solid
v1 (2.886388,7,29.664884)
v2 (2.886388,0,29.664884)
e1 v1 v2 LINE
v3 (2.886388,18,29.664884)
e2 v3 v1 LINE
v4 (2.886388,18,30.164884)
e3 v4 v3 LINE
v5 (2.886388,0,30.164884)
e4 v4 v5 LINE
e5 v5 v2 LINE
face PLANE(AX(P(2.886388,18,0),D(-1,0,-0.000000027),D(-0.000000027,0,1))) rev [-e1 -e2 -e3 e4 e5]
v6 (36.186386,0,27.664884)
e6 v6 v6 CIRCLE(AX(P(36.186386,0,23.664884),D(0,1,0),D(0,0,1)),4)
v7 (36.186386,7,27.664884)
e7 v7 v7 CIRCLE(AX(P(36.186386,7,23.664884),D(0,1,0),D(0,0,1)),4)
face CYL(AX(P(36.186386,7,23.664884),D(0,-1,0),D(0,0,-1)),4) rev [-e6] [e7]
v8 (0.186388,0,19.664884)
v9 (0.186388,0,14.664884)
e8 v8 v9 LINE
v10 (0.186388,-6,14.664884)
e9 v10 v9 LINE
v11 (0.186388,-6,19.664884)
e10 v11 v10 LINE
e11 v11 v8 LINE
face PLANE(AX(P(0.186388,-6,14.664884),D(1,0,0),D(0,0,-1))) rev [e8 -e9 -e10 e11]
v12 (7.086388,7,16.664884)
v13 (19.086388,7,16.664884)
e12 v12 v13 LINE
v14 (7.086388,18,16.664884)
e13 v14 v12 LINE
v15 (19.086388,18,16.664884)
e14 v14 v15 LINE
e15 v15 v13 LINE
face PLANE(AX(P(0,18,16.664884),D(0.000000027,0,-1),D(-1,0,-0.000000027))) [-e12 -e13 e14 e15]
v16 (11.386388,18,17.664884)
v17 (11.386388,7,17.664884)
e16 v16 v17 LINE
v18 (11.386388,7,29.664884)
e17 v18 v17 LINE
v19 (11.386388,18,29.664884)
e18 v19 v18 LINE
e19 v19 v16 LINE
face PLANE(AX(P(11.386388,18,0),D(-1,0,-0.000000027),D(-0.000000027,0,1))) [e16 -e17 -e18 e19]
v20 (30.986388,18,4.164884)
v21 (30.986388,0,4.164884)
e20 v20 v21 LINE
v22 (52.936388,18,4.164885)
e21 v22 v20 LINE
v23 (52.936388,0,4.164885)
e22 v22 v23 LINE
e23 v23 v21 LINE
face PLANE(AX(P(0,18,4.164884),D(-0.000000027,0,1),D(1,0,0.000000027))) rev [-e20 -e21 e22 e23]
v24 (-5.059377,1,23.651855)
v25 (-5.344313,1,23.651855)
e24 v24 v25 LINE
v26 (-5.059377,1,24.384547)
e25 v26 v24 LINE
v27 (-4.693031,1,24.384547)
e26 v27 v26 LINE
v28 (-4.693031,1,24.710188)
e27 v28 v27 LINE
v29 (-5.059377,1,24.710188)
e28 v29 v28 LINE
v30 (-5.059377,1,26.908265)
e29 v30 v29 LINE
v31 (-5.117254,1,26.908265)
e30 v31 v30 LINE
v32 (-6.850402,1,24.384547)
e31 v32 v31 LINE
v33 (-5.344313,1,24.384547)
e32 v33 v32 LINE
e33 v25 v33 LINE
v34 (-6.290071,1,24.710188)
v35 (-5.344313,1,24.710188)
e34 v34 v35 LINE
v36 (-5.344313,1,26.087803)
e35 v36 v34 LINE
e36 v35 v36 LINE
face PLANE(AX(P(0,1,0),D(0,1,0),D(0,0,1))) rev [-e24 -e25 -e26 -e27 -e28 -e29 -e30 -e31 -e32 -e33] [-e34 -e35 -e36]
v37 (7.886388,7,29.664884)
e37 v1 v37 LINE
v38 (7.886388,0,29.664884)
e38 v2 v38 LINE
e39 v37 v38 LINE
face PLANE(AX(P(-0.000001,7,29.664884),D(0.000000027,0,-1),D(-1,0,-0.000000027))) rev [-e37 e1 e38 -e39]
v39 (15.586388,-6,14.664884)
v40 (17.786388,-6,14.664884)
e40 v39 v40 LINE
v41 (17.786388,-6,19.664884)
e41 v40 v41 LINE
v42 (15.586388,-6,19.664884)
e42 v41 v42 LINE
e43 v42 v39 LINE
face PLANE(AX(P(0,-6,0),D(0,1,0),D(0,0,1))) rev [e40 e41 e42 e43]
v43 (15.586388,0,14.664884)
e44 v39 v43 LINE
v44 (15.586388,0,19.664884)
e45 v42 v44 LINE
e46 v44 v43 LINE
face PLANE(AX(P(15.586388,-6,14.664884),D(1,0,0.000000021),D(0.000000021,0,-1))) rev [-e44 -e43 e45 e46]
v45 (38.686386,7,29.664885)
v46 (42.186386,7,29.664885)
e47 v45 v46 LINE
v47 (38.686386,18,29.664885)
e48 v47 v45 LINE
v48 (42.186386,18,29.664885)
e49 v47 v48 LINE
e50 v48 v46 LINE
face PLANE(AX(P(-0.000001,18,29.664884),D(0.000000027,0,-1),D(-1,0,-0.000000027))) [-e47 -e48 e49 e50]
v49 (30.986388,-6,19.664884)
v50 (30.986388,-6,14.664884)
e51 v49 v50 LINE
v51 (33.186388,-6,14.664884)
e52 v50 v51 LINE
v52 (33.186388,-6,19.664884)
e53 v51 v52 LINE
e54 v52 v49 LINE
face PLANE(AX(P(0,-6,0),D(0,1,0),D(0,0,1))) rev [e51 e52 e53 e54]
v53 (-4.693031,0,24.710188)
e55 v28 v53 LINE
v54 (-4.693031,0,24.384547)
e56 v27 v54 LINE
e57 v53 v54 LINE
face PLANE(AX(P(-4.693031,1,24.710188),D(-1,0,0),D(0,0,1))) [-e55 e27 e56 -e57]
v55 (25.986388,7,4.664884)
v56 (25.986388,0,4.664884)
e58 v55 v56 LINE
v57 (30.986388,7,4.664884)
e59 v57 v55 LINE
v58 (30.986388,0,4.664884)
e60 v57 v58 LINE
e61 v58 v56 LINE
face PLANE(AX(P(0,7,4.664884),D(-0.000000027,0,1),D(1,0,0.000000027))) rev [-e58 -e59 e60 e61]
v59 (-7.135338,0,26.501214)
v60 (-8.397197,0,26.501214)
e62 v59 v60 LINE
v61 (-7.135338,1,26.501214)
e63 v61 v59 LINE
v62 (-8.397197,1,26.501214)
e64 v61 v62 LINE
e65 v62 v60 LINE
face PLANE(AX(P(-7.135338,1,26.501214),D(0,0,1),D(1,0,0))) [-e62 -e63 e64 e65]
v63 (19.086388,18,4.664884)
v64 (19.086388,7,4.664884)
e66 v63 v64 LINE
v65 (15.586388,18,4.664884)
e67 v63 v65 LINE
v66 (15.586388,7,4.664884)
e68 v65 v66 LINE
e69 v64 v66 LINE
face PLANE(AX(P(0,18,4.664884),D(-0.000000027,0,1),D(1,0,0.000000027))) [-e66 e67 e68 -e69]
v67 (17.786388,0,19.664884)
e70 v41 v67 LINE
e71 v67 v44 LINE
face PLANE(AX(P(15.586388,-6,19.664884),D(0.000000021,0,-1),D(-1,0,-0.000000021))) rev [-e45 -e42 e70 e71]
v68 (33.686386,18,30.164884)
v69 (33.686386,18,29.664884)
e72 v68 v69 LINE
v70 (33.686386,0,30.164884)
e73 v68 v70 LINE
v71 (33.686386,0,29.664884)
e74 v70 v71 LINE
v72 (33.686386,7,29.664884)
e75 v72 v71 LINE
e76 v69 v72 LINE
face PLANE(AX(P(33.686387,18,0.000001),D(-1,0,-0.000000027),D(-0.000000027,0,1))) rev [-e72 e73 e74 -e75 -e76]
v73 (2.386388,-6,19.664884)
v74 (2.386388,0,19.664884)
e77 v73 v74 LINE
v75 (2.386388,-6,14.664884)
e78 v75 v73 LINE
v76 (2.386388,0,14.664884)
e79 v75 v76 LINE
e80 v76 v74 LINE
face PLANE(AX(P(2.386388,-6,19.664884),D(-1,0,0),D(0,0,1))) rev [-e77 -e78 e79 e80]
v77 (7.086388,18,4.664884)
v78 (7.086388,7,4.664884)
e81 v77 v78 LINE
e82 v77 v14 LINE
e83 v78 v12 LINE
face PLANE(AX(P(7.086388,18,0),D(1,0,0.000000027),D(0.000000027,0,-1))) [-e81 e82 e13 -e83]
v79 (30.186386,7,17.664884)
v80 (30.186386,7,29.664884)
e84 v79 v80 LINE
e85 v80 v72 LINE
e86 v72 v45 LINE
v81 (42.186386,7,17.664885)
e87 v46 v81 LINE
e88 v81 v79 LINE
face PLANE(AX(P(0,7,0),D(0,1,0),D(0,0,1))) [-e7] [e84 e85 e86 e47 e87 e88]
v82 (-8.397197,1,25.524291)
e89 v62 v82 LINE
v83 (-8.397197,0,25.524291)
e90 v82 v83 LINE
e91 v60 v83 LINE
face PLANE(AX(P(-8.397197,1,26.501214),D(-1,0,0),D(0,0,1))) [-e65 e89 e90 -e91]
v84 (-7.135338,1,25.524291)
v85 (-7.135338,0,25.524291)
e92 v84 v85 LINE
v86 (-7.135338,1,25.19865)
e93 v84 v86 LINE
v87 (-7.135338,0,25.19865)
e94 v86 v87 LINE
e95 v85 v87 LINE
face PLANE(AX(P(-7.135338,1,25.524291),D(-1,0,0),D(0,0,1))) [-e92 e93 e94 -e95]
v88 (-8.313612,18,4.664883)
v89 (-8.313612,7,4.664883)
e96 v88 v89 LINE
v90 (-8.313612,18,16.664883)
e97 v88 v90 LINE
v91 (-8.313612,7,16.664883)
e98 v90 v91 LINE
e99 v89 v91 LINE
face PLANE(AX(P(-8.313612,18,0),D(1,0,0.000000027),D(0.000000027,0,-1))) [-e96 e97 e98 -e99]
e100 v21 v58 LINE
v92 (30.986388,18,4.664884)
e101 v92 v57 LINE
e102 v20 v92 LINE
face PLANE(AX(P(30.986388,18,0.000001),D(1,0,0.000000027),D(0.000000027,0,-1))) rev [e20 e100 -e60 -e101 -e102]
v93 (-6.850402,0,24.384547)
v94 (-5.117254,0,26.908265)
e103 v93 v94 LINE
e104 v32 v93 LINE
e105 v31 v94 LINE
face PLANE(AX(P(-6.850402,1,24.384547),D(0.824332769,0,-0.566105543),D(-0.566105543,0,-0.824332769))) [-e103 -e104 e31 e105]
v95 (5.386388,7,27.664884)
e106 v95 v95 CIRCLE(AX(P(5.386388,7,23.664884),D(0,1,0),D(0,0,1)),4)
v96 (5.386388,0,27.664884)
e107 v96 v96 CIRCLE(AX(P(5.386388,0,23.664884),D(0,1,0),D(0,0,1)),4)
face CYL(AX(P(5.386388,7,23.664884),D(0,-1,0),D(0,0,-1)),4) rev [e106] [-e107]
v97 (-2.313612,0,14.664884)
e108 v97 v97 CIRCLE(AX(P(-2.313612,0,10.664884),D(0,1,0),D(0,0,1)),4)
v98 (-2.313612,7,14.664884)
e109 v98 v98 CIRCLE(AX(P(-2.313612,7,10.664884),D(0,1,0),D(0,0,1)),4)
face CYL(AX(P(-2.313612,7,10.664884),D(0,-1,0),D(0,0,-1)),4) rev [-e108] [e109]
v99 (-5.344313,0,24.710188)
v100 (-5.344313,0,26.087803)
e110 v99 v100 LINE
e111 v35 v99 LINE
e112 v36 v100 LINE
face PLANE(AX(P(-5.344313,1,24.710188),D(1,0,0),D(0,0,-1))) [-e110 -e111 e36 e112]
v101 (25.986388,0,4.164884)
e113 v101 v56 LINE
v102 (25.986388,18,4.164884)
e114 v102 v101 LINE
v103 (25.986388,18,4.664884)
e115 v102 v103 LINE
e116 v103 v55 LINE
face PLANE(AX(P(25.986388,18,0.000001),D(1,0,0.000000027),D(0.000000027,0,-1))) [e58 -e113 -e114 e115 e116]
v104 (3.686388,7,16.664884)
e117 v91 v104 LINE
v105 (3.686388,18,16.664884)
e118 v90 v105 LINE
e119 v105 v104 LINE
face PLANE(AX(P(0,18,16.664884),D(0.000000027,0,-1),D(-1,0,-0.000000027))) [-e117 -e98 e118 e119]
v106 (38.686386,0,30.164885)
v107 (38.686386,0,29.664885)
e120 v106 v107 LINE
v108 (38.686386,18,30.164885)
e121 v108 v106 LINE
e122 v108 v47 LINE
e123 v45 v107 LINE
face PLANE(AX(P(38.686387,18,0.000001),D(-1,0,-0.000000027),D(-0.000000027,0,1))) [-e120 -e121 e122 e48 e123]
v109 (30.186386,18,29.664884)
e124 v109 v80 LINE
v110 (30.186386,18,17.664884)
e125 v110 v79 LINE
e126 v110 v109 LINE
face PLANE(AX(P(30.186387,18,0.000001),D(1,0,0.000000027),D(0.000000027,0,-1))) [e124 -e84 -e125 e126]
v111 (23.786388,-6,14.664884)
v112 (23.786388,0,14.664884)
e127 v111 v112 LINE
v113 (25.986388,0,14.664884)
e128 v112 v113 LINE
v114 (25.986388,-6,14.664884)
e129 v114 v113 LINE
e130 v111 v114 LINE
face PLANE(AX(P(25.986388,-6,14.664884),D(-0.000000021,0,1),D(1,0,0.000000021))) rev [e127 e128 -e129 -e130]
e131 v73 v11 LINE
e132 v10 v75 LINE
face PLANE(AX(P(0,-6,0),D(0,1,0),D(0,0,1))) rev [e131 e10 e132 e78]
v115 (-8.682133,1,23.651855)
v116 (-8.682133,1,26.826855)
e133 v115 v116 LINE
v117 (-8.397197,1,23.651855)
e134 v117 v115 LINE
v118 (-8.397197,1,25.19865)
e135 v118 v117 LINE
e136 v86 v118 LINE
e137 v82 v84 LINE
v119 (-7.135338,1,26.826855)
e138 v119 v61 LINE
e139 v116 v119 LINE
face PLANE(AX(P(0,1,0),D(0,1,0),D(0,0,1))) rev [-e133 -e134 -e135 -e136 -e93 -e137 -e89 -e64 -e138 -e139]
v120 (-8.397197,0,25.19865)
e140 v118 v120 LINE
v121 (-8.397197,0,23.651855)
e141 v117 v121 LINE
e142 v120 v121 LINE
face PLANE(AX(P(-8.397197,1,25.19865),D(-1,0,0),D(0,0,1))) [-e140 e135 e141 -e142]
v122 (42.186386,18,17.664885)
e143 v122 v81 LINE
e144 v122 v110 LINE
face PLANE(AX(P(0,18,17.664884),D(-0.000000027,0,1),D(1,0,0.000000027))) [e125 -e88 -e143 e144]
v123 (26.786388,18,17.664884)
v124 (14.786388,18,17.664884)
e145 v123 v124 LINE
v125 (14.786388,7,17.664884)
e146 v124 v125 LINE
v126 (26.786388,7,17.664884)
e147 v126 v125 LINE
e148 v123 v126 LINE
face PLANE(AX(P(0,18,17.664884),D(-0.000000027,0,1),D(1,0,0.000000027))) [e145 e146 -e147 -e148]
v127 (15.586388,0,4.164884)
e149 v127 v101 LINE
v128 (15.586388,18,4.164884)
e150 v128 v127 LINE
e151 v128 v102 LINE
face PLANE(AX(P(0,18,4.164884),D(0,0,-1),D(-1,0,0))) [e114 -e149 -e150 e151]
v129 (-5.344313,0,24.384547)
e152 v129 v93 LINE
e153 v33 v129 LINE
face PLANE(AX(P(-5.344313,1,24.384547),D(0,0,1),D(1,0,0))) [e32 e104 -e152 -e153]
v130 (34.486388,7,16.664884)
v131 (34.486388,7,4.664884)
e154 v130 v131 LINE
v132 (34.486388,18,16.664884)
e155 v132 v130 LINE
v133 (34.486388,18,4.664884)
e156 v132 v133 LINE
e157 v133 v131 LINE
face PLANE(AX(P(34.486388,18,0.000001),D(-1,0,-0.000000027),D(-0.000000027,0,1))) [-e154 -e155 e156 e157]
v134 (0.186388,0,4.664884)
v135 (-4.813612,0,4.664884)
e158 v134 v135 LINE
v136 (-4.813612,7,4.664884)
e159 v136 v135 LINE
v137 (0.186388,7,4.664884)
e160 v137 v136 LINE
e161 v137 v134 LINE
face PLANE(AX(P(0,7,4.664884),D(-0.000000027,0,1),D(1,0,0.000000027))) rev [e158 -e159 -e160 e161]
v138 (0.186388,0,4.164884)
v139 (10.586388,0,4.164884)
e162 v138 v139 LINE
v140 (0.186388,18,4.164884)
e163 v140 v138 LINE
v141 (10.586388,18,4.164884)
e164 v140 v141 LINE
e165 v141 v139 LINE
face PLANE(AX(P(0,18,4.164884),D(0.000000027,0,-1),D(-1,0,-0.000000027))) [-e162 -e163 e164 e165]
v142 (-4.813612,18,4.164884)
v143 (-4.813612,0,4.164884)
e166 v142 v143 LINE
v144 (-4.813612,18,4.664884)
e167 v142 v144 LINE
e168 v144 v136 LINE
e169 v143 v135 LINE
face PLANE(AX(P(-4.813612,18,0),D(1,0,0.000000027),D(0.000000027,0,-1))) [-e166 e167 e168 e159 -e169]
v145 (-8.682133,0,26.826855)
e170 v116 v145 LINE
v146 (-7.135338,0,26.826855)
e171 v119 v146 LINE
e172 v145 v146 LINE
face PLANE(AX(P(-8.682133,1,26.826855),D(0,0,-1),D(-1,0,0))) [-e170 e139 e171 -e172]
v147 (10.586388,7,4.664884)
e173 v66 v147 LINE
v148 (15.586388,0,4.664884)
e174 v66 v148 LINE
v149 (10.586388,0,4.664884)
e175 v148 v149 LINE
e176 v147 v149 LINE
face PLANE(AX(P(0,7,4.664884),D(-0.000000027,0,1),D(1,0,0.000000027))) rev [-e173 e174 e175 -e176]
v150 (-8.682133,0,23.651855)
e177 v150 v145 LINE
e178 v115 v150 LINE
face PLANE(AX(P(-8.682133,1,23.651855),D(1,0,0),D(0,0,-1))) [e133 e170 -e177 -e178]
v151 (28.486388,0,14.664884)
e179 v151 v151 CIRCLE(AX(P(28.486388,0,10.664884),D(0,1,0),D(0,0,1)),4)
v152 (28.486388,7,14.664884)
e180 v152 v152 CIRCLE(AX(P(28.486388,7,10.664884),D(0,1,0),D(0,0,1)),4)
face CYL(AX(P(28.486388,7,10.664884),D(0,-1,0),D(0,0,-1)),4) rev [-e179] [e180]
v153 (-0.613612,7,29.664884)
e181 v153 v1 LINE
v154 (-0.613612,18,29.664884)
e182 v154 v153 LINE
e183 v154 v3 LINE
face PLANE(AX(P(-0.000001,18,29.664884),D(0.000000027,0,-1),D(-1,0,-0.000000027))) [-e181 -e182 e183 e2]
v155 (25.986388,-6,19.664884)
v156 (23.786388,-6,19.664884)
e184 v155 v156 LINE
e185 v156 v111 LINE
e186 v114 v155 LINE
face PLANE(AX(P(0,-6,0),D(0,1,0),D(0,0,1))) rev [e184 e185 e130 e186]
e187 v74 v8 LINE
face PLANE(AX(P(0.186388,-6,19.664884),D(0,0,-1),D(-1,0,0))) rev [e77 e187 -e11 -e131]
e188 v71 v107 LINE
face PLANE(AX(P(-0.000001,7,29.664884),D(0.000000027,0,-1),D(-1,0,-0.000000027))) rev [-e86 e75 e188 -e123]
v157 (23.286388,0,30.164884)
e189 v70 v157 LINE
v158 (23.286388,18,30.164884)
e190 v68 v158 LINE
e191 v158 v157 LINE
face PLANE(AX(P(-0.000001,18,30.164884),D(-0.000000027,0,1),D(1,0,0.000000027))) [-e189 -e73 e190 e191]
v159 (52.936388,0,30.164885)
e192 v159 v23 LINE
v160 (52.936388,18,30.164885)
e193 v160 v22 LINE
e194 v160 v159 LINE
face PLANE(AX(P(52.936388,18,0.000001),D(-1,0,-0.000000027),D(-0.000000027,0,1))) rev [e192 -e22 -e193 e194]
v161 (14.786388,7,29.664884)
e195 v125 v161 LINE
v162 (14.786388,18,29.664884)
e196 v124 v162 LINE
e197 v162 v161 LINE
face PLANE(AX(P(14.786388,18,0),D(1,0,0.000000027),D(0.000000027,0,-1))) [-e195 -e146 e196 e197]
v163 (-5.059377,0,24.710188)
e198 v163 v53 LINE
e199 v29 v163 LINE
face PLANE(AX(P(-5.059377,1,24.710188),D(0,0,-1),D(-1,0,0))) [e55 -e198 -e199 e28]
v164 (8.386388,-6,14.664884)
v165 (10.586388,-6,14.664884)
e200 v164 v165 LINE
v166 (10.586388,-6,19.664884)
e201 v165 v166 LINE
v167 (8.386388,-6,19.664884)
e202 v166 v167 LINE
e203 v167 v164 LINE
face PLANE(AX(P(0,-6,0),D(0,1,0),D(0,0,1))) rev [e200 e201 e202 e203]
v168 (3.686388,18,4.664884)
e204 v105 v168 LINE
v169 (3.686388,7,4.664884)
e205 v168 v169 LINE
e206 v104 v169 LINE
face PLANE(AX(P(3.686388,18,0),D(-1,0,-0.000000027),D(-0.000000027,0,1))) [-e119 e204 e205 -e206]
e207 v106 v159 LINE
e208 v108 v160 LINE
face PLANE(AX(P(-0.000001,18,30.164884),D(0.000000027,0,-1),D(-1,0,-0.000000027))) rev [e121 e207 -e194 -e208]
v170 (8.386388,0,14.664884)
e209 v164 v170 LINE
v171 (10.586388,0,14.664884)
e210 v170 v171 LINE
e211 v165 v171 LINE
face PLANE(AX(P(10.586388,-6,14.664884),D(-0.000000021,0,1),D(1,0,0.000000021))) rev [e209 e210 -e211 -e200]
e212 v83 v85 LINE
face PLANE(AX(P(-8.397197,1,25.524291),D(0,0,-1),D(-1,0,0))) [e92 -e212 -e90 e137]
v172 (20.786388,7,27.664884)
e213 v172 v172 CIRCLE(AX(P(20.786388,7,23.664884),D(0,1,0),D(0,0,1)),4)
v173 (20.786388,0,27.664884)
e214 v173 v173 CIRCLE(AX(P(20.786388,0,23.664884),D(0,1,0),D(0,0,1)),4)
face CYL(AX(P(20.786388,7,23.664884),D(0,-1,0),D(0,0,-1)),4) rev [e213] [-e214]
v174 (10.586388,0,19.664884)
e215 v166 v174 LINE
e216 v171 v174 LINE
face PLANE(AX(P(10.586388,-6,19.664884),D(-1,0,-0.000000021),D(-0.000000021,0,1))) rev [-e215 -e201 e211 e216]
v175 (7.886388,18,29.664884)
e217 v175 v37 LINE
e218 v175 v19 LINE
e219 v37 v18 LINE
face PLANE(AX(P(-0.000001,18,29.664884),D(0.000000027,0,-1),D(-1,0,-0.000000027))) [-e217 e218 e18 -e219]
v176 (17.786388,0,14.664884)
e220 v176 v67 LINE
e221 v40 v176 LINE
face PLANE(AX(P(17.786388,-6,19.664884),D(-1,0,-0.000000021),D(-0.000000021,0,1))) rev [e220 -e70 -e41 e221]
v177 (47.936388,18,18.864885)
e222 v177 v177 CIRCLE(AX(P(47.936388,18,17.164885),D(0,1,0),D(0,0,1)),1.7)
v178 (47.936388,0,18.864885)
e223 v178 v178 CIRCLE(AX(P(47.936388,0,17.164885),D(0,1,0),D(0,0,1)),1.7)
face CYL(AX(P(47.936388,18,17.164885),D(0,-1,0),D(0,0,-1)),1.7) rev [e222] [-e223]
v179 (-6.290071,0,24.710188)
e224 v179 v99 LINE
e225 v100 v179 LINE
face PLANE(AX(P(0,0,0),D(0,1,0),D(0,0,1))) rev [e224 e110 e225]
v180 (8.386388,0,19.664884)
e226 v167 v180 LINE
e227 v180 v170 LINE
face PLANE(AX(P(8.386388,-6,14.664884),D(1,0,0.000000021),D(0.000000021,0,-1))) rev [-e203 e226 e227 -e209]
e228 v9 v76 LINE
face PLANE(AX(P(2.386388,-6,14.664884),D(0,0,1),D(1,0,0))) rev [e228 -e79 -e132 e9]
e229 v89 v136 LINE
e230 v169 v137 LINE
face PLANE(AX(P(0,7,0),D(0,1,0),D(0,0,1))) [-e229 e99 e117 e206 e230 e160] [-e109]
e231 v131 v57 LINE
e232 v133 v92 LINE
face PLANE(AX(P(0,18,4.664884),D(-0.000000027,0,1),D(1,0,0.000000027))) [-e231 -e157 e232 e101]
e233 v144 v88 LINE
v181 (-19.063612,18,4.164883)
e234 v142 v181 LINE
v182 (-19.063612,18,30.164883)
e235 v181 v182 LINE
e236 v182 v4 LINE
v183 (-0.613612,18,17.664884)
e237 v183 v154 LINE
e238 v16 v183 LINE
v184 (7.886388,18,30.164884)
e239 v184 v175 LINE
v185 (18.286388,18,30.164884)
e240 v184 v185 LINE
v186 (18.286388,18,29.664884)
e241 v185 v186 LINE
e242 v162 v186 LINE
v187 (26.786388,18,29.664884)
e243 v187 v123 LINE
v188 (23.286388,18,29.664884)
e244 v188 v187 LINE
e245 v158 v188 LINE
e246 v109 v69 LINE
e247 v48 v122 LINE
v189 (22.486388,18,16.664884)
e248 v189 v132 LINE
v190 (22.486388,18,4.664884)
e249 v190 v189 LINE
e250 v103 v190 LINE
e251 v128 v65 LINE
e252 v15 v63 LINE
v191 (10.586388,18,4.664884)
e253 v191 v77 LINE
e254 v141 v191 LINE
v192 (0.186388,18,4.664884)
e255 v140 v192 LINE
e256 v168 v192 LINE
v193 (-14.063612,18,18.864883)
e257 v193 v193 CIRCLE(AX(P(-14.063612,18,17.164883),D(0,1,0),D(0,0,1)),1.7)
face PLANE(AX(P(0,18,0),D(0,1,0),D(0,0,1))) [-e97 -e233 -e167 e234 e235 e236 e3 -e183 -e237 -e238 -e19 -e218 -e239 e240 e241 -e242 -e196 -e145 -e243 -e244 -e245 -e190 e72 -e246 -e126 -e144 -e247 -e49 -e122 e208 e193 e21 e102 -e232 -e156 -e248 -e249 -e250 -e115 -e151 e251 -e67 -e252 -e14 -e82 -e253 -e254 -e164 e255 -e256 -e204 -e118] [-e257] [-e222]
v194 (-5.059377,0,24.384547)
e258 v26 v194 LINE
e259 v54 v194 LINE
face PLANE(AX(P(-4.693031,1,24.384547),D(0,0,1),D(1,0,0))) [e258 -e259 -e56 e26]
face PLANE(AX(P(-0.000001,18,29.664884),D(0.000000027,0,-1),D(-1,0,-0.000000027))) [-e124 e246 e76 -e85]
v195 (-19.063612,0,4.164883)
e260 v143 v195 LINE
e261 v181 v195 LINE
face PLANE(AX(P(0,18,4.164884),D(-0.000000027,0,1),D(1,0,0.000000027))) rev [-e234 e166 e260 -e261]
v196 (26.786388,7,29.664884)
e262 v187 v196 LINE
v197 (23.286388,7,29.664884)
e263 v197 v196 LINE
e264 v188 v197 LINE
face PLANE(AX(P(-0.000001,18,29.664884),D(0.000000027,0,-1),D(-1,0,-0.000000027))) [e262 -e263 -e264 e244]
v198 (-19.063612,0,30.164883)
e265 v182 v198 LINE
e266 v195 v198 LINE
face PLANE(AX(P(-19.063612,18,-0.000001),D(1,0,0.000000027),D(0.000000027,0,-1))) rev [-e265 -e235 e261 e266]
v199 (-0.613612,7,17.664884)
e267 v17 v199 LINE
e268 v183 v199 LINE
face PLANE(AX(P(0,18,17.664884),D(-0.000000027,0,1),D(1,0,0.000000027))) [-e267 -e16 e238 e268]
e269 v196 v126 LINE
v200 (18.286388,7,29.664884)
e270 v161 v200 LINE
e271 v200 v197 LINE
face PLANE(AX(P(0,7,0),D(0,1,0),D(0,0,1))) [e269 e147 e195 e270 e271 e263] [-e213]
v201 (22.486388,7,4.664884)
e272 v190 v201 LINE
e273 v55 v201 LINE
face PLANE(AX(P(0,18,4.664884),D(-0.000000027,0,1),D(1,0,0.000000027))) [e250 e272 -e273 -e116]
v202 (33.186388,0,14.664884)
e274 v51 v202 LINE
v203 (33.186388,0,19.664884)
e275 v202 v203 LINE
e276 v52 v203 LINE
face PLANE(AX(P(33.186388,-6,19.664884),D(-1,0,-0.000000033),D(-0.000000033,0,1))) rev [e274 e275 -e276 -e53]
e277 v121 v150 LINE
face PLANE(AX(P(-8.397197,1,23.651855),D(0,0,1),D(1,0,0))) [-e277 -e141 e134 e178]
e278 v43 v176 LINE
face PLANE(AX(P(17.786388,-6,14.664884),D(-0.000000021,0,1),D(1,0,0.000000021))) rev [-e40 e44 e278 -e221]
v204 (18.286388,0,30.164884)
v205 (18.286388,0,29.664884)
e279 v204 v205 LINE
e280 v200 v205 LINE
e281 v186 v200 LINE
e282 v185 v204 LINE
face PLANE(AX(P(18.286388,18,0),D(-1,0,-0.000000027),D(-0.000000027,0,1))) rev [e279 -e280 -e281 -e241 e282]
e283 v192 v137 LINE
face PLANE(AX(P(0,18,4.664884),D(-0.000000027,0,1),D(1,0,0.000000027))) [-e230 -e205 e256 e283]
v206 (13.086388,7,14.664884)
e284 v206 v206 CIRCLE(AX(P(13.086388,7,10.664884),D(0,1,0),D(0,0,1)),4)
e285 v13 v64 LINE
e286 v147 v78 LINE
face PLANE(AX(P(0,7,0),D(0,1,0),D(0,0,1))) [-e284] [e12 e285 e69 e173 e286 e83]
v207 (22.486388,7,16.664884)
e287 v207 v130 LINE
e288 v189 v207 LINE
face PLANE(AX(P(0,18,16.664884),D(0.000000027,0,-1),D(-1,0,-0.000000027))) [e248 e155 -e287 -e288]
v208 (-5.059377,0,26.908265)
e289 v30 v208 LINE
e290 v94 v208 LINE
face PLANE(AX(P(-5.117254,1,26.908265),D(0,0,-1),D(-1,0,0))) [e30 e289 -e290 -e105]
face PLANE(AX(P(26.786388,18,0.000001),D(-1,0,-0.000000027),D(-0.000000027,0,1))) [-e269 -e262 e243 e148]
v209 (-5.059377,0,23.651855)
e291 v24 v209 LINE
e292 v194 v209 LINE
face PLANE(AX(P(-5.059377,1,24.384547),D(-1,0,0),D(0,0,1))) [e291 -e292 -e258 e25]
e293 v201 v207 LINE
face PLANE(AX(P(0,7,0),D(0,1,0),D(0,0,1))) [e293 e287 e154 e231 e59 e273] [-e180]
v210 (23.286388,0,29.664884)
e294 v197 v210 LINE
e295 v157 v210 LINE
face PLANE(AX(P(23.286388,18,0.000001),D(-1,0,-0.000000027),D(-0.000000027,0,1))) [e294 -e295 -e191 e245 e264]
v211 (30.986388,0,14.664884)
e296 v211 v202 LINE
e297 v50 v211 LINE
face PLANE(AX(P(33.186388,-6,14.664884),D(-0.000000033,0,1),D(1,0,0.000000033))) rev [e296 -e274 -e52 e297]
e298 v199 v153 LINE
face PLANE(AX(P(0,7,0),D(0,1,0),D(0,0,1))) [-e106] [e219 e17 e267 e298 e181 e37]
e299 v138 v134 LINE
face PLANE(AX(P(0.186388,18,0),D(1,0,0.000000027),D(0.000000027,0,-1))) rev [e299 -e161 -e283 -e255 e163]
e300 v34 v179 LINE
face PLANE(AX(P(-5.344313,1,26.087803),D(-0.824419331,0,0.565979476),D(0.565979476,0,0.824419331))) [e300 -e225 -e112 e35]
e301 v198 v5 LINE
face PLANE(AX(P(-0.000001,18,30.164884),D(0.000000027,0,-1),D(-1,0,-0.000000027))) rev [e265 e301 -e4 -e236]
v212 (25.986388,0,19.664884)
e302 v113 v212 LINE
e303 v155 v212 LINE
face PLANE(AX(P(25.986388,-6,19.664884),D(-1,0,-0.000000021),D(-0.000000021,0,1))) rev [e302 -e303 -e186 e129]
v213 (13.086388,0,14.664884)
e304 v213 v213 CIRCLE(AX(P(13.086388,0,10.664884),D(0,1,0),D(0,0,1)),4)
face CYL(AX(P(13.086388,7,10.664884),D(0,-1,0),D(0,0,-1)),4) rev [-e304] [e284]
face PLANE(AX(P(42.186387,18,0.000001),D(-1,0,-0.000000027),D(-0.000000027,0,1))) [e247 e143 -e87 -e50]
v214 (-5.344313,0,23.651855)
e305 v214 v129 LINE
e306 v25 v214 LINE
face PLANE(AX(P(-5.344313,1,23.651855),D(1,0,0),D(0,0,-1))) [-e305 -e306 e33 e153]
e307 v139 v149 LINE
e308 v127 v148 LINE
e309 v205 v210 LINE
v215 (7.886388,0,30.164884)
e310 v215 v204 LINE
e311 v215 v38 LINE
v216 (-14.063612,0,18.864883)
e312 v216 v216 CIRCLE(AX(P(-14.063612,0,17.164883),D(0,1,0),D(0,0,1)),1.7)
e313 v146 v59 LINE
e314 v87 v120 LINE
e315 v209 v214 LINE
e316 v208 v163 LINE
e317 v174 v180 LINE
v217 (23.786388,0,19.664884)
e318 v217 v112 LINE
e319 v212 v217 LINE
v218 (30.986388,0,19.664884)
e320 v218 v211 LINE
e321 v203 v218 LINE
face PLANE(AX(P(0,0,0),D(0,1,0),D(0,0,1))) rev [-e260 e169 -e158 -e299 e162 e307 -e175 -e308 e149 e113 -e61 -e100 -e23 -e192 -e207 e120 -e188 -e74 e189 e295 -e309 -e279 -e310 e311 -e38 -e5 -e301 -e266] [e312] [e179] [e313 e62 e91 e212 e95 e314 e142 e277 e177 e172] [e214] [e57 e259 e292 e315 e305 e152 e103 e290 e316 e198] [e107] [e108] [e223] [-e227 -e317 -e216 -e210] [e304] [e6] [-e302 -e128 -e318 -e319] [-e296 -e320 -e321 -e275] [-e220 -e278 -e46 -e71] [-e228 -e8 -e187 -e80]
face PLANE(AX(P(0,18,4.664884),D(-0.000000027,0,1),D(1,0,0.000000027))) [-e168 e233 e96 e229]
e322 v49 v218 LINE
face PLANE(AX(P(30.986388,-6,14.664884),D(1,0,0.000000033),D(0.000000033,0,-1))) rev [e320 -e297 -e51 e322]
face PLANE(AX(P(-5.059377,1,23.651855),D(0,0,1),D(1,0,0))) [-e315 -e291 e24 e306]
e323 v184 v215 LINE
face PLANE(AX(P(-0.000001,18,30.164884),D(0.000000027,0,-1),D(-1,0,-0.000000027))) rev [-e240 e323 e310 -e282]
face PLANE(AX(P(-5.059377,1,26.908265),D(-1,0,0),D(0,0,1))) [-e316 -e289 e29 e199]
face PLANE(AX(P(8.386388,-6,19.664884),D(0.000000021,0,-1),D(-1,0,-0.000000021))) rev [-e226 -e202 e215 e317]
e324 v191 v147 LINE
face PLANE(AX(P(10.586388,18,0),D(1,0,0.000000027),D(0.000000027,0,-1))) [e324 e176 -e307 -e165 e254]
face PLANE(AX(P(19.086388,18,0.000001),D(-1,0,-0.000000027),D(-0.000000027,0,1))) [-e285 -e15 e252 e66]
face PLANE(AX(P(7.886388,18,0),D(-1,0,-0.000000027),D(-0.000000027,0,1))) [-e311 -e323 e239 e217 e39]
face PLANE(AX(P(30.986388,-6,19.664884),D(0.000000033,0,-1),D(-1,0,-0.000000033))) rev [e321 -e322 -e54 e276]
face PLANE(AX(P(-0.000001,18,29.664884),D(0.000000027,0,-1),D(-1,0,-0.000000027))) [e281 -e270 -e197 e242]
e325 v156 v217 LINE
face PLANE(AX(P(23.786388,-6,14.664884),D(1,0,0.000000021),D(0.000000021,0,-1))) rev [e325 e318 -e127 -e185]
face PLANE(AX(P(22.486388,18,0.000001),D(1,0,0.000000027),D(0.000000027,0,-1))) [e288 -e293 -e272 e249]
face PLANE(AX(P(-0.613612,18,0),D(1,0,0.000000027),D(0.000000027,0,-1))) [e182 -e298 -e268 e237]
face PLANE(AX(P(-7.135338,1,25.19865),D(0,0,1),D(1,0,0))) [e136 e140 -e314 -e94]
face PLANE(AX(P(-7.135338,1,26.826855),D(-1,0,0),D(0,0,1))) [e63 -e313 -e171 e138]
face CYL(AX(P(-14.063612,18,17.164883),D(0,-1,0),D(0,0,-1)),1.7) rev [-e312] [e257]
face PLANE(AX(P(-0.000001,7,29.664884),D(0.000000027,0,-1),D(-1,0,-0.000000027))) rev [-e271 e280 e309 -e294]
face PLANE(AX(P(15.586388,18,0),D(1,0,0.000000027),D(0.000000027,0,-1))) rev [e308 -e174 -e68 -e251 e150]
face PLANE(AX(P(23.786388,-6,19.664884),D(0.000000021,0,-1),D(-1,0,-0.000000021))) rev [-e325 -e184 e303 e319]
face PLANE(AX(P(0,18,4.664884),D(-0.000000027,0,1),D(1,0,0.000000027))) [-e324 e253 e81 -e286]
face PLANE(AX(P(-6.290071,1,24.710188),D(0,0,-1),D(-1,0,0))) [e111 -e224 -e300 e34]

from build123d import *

# Parameters (mm, degrees)
SKETCH1_R               = 4
BOSS_EXTRUDE1_DEPTH     = 7
BOSS_EXTRUDE1_2_DEPTH   = 7
BOSS_EXTRUDE1_3_DEPTH   = 7
BOSS_EXTRUDE1_4_DEPTH   = 7
BOSS_EXTRUDE1_5_DEPTH   = 7
BOSS_EXTRUDE1_6_DEPTH   = 7
BOSS_EXTRUDE2_OUTLINE_R = 1.700000005
BOSS_EXTRUDE2_DEPTH     = 18
SKETCH2_W               = 2.2
SKETCH2_H               = 5.00000001
BOSS_EXTRUDE3_DEPTH     = 6
CUT_EXTRUDE1_DEPTH      = 1


# Read off the part's stored shape, not the designer's step: Boss-Extrude2
with BuildPart() as part:
    # Sketch1 → Boss-Extrude1 (new body)
    with BuildSketch(Plane(origin=(0, 0, 0), x_dir=(1, 0, 0), z_dir=(0, 1, 0))):
        Polygon((3.686387934, -16.664883738), (3.686388262, -4.664883738), (-8.313611738, -4.66488341), (-8.313612066, -16.66488341), align=None)
        with Locations(Location((-2.313611902, -10.664883574, 0), (0, 0, 270))):
            Circle(SKETCH1_R, mode=Mode.SUBTRACT)
    extrude(amount=BOSS_EXTRUDE1_DEPTH)



with BuildPart() as body_2:
    # Sketch1 → Boss-Extrude1 2 (new body)
    with BuildSketch(Plane(origin=(0, 0, 0), x_dir=(1, 0, 0), z_dir=(0, 1, 0))):
        Polygon((19.086387939, -16.664884095), (19.086388267, -4.664884095), (7.086388267, -4.664883767), (7.086387939, -16.664883767), align=None)
        with Locations(Location((13.086388103, -10.664883931, 0), (0, 0, 270))):
            Circle(SKETCH1_R, mode=Mode.SUBTRACT)
    extrude(amount=BOSS_EXTRUDE1_2_DEPTH)


with BuildPart() as body_3:
    # Sketch1 → Boss-Extrude1 3 (new body)
    with BuildSketch(Plane(origin=(0, 0, 0), x_dir=(1, 0, 0), z_dir=(0, 1, 0))):
        Polygon((34.486387949, -16.66488445), (34.486388277, -4.66488445), (22.486388277, -4.664884122), (22.486387949, -16.664884122), align=None)
        with Locations(Location((28.486388113, -10.664884286, 0), (0, 0, 270))):
            Circle(SKETCH1_R, mode=Mode.SUBTRACT)
    extrude(amount=BOSS_EXTRUDE1_3_DEPTH)


with BuildPart() as body_4:
    # Sketch1 → Boss-Extrude1 4 (new body)
    with BuildSketch(Plane(origin=(0, 0, 0), x_dir=(1, 0, 0), z_dir=(0, 1, 0))):
        Polygon((14.786387887, -17.664883977), (14.786387559, -29.664883977), (26.786387559, -29.664884305), (26.786387887, -17.664884305), align=None)
        with Locations(Location((20.786387723, -23.664884141, 0), (0, 0, 270))):
            Circle(SKETCH1_R, mode=Mode.SUBTRACT)
    extrude(amount=BOSS_EXTRUDE1_4_DEPTH)


with BuildPart() as body_5:
    # Sketch1 → Boss-Extrude1 5 (new body)
    with BuildSketch(Plane(origin=(0, 0, 0), x_dir=(1, 0, 0), z_dir=(0, 1, 0))):
        Polygon((30.186386338, -17.664884333), (30.18638601, -29.664884333), (42.18638601, -29.664884661), (42.186386338, -17.664884661), align=None)
        with Locations(Location((36.186386174, -23.664884497, 0), (0, 0, 270))):
            Circle(SKETCH1_R, mode=Mode.SUBTRACT)
    extrude(amount=BOSS_EXTRUDE1_5_DEPTH)


with BuildPart() as body_6:
    # Sketch1 → Boss-Extrude1 6 (new body)
    with BuildSketch(Plane(origin=(0, 0, 0), x_dir=(1, 0, 0), z_dir=(0, 1, 0))):
        Polygon((-0.613612103, -17.664883618), (-0.613612431, -29.664883618), (11.386387569, -29.664883947), (11.386387897, -17.664883947), align=None)
        with Locations(Location((5.386387733, -23.664883782, 0), (0, 0, 270))):
            Circle(SKETCH1_R, mode=Mode.SUBTRACT)
    extrude(amount=BOSS_EXTRUDE1_6_DEPTH)


with BuildPart() as part_1:
    add(part.part)

    add(body_2.part)  # Boss-Extrude2 merges body 2

    add(body_3.part)  # Boss-Extrude2 merges body 3

    add(body_4.part)  # Boss-Extrude2 merges body 4

    add(body_5.part)  # Boss-Extrude2 merges body 5

    add(body_6.part)  # Boss-Extrude2 merges body 6
    # Boss-Extrude2 outline → Boss-Extrude2 (add)
    with BuildSketch(Plane(origin=(0, 0, 0), x_dir=(1, 0, 0), z_dir=(0, 1, 0))):
        Polygon((10.586388267, -4.664883862), (10.586388281, -4.164883862), (0.186388276, -4.164883578), (0.186388262, -4.664883642), (3.686388262, -4.664883738), (3.686387934, -16.664883738), (-8.313612066, -16.66488341), (-8.313611738, -4.66488341), (-4.813611731, -4.664883505), (-4.813611724, -4.164883505), (-19.06361173, -4.164883116), (-19.06361244, -30.164883114), (2.886387555, -30.164883714), (2.886387569, -29.664883714), (-0.613612431, -29.664883618), (-0.613612103, -17.664883618), (11.386387897, -17.664883947), (11.386387569, -29.664883947), (7.886387562, -29.664883851), (7.886387555, -30.164883851), (18.286387545, -30.164884073), (18.286387559, -29.664884073), (14.786387559, -29.664883977), (14.786387887, -17.664883977), (26.786387887, -17.664884305), (26.786387559, -29.664884305), (23.286387552, -29.66488421), (23.286387545, -30.16488421), (33.686385997, -30.164884494), (33.68638601, -29.664884428), (30.18638601, -29.664884333), (30.186386338, -17.664884333), (42.186386338, -17.664884661), (42.18638601, -29.664884661), (38.686386004, -29.664884565), (38.686385997, -30.164884565), (52.93638756, -30.164884954), (52.93638827, -4.164885084), (30.986388291, -4.164884354), (30.986388277, -4.664884354), (34.486388277, -4.66488445), (34.486387949, -16.66488445), (22.486387949, -16.664884122), (22.486388277, -4.664884122), (25.986388284, -4.664884218), (25.986388291, -4.164884218), (15.586388281, -4.164884108), (15.586388267, -4.664883999), (19.086388267, -4.664884095), (19.086387939, -16.664884095), (7.086387939, -16.664883767), (7.086388267, -4.664883767), align=None)
        with Locations((47.936387915, -17.164884883)):
            Circle(BOSS_EXTRUDE2_OUTLINE_R, mode=Mode.SUBTRACT)
        with Locations((-14.063612085, -17.164883252)):
            Circle(BOSS_EXTRUDE2_OUTLINE_R, mode=Mode.SUBTRACT)
    extrude(amount=BOSS_EXTRUDE2_DEPTH)

    # Sketch2 → Boss-Extrude3 (add)
    with BuildSketch(Plane.XZ):
        Polygon((10.586387955, 19.664883873), (10.586388061, 14.664883862), (8.386388061, 14.664883816), (8.386387955, 19.664883826), align=None)
        Polygon((25.986387967, 19.664884228), (25.986388072, 14.664884218), (23.786388072, 14.664884171), (23.786387967, 19.664884182), align=None)
        Polygon((33.186387781, 19.664884438), (33.186387947, 14.664884428), (30.986387947, 14.664884354), (30.986387781, 19.664884365), align=None)
        Polygon((17.786387957, 19.664884055), (17.786388062, 14.664884045), (15.586388062, 14.664883999), (15.586387957, 19.664884009), align=None)
        with Locations((1.286388276, 17.164883628)):
            Rectangle(SKETCH2_W, SKETCH2_H)
    extrude(amount=BOSS_EXTRUDE3_DEPTH)

    # Sketch3 → Cut-Extrude1 (cut)
    # profile 1 of 2: a face of its own
    with BuildSketch(Plane.XZ):
        Polygon((-8.682133254, 26.826855078), (-7.135338382, 26.826855078), (-7.135338382, 26.501214052), (-8.397197357, 26.501214052), (-8.397197357, 25.524290975), (-7.135338382, 25.524290975), (-7.135338382, 25.198649949), (-8.397197357, 25.198649949), (-8.397197357, 23.651855078), (-8.682133254, 23.651855078), align=None)
    # profile 2 of 2: a face of its own
    with BuildSketch(Plane.XZ):
        Polygon((-5.117254448, 26.908265334), (-5.059376844, 26.908265334), (-5.059376844, 24.710188411), (-4.69303069, 24.710188411), (-4.69303069, 24.384547385), (-5.059376844, 24.384547385), (-5.059376844, 23.651855078), (-5.344312741, 23.651855078), (-5.344312741, 24.384547385), (-6.850402485, 24.384547385), align=None)
        Polygon((-5.344312741, 24.710188411), (-5.344312741, 26.087802594), (-6.290070954, 24.710188411), align=None, mode=Mode.SUBTRACT)
    extrude(amount=-CUT_EXTRUDE1_DEPTH, mode=Mode.SUBTRACT)


solid = part_1.part
